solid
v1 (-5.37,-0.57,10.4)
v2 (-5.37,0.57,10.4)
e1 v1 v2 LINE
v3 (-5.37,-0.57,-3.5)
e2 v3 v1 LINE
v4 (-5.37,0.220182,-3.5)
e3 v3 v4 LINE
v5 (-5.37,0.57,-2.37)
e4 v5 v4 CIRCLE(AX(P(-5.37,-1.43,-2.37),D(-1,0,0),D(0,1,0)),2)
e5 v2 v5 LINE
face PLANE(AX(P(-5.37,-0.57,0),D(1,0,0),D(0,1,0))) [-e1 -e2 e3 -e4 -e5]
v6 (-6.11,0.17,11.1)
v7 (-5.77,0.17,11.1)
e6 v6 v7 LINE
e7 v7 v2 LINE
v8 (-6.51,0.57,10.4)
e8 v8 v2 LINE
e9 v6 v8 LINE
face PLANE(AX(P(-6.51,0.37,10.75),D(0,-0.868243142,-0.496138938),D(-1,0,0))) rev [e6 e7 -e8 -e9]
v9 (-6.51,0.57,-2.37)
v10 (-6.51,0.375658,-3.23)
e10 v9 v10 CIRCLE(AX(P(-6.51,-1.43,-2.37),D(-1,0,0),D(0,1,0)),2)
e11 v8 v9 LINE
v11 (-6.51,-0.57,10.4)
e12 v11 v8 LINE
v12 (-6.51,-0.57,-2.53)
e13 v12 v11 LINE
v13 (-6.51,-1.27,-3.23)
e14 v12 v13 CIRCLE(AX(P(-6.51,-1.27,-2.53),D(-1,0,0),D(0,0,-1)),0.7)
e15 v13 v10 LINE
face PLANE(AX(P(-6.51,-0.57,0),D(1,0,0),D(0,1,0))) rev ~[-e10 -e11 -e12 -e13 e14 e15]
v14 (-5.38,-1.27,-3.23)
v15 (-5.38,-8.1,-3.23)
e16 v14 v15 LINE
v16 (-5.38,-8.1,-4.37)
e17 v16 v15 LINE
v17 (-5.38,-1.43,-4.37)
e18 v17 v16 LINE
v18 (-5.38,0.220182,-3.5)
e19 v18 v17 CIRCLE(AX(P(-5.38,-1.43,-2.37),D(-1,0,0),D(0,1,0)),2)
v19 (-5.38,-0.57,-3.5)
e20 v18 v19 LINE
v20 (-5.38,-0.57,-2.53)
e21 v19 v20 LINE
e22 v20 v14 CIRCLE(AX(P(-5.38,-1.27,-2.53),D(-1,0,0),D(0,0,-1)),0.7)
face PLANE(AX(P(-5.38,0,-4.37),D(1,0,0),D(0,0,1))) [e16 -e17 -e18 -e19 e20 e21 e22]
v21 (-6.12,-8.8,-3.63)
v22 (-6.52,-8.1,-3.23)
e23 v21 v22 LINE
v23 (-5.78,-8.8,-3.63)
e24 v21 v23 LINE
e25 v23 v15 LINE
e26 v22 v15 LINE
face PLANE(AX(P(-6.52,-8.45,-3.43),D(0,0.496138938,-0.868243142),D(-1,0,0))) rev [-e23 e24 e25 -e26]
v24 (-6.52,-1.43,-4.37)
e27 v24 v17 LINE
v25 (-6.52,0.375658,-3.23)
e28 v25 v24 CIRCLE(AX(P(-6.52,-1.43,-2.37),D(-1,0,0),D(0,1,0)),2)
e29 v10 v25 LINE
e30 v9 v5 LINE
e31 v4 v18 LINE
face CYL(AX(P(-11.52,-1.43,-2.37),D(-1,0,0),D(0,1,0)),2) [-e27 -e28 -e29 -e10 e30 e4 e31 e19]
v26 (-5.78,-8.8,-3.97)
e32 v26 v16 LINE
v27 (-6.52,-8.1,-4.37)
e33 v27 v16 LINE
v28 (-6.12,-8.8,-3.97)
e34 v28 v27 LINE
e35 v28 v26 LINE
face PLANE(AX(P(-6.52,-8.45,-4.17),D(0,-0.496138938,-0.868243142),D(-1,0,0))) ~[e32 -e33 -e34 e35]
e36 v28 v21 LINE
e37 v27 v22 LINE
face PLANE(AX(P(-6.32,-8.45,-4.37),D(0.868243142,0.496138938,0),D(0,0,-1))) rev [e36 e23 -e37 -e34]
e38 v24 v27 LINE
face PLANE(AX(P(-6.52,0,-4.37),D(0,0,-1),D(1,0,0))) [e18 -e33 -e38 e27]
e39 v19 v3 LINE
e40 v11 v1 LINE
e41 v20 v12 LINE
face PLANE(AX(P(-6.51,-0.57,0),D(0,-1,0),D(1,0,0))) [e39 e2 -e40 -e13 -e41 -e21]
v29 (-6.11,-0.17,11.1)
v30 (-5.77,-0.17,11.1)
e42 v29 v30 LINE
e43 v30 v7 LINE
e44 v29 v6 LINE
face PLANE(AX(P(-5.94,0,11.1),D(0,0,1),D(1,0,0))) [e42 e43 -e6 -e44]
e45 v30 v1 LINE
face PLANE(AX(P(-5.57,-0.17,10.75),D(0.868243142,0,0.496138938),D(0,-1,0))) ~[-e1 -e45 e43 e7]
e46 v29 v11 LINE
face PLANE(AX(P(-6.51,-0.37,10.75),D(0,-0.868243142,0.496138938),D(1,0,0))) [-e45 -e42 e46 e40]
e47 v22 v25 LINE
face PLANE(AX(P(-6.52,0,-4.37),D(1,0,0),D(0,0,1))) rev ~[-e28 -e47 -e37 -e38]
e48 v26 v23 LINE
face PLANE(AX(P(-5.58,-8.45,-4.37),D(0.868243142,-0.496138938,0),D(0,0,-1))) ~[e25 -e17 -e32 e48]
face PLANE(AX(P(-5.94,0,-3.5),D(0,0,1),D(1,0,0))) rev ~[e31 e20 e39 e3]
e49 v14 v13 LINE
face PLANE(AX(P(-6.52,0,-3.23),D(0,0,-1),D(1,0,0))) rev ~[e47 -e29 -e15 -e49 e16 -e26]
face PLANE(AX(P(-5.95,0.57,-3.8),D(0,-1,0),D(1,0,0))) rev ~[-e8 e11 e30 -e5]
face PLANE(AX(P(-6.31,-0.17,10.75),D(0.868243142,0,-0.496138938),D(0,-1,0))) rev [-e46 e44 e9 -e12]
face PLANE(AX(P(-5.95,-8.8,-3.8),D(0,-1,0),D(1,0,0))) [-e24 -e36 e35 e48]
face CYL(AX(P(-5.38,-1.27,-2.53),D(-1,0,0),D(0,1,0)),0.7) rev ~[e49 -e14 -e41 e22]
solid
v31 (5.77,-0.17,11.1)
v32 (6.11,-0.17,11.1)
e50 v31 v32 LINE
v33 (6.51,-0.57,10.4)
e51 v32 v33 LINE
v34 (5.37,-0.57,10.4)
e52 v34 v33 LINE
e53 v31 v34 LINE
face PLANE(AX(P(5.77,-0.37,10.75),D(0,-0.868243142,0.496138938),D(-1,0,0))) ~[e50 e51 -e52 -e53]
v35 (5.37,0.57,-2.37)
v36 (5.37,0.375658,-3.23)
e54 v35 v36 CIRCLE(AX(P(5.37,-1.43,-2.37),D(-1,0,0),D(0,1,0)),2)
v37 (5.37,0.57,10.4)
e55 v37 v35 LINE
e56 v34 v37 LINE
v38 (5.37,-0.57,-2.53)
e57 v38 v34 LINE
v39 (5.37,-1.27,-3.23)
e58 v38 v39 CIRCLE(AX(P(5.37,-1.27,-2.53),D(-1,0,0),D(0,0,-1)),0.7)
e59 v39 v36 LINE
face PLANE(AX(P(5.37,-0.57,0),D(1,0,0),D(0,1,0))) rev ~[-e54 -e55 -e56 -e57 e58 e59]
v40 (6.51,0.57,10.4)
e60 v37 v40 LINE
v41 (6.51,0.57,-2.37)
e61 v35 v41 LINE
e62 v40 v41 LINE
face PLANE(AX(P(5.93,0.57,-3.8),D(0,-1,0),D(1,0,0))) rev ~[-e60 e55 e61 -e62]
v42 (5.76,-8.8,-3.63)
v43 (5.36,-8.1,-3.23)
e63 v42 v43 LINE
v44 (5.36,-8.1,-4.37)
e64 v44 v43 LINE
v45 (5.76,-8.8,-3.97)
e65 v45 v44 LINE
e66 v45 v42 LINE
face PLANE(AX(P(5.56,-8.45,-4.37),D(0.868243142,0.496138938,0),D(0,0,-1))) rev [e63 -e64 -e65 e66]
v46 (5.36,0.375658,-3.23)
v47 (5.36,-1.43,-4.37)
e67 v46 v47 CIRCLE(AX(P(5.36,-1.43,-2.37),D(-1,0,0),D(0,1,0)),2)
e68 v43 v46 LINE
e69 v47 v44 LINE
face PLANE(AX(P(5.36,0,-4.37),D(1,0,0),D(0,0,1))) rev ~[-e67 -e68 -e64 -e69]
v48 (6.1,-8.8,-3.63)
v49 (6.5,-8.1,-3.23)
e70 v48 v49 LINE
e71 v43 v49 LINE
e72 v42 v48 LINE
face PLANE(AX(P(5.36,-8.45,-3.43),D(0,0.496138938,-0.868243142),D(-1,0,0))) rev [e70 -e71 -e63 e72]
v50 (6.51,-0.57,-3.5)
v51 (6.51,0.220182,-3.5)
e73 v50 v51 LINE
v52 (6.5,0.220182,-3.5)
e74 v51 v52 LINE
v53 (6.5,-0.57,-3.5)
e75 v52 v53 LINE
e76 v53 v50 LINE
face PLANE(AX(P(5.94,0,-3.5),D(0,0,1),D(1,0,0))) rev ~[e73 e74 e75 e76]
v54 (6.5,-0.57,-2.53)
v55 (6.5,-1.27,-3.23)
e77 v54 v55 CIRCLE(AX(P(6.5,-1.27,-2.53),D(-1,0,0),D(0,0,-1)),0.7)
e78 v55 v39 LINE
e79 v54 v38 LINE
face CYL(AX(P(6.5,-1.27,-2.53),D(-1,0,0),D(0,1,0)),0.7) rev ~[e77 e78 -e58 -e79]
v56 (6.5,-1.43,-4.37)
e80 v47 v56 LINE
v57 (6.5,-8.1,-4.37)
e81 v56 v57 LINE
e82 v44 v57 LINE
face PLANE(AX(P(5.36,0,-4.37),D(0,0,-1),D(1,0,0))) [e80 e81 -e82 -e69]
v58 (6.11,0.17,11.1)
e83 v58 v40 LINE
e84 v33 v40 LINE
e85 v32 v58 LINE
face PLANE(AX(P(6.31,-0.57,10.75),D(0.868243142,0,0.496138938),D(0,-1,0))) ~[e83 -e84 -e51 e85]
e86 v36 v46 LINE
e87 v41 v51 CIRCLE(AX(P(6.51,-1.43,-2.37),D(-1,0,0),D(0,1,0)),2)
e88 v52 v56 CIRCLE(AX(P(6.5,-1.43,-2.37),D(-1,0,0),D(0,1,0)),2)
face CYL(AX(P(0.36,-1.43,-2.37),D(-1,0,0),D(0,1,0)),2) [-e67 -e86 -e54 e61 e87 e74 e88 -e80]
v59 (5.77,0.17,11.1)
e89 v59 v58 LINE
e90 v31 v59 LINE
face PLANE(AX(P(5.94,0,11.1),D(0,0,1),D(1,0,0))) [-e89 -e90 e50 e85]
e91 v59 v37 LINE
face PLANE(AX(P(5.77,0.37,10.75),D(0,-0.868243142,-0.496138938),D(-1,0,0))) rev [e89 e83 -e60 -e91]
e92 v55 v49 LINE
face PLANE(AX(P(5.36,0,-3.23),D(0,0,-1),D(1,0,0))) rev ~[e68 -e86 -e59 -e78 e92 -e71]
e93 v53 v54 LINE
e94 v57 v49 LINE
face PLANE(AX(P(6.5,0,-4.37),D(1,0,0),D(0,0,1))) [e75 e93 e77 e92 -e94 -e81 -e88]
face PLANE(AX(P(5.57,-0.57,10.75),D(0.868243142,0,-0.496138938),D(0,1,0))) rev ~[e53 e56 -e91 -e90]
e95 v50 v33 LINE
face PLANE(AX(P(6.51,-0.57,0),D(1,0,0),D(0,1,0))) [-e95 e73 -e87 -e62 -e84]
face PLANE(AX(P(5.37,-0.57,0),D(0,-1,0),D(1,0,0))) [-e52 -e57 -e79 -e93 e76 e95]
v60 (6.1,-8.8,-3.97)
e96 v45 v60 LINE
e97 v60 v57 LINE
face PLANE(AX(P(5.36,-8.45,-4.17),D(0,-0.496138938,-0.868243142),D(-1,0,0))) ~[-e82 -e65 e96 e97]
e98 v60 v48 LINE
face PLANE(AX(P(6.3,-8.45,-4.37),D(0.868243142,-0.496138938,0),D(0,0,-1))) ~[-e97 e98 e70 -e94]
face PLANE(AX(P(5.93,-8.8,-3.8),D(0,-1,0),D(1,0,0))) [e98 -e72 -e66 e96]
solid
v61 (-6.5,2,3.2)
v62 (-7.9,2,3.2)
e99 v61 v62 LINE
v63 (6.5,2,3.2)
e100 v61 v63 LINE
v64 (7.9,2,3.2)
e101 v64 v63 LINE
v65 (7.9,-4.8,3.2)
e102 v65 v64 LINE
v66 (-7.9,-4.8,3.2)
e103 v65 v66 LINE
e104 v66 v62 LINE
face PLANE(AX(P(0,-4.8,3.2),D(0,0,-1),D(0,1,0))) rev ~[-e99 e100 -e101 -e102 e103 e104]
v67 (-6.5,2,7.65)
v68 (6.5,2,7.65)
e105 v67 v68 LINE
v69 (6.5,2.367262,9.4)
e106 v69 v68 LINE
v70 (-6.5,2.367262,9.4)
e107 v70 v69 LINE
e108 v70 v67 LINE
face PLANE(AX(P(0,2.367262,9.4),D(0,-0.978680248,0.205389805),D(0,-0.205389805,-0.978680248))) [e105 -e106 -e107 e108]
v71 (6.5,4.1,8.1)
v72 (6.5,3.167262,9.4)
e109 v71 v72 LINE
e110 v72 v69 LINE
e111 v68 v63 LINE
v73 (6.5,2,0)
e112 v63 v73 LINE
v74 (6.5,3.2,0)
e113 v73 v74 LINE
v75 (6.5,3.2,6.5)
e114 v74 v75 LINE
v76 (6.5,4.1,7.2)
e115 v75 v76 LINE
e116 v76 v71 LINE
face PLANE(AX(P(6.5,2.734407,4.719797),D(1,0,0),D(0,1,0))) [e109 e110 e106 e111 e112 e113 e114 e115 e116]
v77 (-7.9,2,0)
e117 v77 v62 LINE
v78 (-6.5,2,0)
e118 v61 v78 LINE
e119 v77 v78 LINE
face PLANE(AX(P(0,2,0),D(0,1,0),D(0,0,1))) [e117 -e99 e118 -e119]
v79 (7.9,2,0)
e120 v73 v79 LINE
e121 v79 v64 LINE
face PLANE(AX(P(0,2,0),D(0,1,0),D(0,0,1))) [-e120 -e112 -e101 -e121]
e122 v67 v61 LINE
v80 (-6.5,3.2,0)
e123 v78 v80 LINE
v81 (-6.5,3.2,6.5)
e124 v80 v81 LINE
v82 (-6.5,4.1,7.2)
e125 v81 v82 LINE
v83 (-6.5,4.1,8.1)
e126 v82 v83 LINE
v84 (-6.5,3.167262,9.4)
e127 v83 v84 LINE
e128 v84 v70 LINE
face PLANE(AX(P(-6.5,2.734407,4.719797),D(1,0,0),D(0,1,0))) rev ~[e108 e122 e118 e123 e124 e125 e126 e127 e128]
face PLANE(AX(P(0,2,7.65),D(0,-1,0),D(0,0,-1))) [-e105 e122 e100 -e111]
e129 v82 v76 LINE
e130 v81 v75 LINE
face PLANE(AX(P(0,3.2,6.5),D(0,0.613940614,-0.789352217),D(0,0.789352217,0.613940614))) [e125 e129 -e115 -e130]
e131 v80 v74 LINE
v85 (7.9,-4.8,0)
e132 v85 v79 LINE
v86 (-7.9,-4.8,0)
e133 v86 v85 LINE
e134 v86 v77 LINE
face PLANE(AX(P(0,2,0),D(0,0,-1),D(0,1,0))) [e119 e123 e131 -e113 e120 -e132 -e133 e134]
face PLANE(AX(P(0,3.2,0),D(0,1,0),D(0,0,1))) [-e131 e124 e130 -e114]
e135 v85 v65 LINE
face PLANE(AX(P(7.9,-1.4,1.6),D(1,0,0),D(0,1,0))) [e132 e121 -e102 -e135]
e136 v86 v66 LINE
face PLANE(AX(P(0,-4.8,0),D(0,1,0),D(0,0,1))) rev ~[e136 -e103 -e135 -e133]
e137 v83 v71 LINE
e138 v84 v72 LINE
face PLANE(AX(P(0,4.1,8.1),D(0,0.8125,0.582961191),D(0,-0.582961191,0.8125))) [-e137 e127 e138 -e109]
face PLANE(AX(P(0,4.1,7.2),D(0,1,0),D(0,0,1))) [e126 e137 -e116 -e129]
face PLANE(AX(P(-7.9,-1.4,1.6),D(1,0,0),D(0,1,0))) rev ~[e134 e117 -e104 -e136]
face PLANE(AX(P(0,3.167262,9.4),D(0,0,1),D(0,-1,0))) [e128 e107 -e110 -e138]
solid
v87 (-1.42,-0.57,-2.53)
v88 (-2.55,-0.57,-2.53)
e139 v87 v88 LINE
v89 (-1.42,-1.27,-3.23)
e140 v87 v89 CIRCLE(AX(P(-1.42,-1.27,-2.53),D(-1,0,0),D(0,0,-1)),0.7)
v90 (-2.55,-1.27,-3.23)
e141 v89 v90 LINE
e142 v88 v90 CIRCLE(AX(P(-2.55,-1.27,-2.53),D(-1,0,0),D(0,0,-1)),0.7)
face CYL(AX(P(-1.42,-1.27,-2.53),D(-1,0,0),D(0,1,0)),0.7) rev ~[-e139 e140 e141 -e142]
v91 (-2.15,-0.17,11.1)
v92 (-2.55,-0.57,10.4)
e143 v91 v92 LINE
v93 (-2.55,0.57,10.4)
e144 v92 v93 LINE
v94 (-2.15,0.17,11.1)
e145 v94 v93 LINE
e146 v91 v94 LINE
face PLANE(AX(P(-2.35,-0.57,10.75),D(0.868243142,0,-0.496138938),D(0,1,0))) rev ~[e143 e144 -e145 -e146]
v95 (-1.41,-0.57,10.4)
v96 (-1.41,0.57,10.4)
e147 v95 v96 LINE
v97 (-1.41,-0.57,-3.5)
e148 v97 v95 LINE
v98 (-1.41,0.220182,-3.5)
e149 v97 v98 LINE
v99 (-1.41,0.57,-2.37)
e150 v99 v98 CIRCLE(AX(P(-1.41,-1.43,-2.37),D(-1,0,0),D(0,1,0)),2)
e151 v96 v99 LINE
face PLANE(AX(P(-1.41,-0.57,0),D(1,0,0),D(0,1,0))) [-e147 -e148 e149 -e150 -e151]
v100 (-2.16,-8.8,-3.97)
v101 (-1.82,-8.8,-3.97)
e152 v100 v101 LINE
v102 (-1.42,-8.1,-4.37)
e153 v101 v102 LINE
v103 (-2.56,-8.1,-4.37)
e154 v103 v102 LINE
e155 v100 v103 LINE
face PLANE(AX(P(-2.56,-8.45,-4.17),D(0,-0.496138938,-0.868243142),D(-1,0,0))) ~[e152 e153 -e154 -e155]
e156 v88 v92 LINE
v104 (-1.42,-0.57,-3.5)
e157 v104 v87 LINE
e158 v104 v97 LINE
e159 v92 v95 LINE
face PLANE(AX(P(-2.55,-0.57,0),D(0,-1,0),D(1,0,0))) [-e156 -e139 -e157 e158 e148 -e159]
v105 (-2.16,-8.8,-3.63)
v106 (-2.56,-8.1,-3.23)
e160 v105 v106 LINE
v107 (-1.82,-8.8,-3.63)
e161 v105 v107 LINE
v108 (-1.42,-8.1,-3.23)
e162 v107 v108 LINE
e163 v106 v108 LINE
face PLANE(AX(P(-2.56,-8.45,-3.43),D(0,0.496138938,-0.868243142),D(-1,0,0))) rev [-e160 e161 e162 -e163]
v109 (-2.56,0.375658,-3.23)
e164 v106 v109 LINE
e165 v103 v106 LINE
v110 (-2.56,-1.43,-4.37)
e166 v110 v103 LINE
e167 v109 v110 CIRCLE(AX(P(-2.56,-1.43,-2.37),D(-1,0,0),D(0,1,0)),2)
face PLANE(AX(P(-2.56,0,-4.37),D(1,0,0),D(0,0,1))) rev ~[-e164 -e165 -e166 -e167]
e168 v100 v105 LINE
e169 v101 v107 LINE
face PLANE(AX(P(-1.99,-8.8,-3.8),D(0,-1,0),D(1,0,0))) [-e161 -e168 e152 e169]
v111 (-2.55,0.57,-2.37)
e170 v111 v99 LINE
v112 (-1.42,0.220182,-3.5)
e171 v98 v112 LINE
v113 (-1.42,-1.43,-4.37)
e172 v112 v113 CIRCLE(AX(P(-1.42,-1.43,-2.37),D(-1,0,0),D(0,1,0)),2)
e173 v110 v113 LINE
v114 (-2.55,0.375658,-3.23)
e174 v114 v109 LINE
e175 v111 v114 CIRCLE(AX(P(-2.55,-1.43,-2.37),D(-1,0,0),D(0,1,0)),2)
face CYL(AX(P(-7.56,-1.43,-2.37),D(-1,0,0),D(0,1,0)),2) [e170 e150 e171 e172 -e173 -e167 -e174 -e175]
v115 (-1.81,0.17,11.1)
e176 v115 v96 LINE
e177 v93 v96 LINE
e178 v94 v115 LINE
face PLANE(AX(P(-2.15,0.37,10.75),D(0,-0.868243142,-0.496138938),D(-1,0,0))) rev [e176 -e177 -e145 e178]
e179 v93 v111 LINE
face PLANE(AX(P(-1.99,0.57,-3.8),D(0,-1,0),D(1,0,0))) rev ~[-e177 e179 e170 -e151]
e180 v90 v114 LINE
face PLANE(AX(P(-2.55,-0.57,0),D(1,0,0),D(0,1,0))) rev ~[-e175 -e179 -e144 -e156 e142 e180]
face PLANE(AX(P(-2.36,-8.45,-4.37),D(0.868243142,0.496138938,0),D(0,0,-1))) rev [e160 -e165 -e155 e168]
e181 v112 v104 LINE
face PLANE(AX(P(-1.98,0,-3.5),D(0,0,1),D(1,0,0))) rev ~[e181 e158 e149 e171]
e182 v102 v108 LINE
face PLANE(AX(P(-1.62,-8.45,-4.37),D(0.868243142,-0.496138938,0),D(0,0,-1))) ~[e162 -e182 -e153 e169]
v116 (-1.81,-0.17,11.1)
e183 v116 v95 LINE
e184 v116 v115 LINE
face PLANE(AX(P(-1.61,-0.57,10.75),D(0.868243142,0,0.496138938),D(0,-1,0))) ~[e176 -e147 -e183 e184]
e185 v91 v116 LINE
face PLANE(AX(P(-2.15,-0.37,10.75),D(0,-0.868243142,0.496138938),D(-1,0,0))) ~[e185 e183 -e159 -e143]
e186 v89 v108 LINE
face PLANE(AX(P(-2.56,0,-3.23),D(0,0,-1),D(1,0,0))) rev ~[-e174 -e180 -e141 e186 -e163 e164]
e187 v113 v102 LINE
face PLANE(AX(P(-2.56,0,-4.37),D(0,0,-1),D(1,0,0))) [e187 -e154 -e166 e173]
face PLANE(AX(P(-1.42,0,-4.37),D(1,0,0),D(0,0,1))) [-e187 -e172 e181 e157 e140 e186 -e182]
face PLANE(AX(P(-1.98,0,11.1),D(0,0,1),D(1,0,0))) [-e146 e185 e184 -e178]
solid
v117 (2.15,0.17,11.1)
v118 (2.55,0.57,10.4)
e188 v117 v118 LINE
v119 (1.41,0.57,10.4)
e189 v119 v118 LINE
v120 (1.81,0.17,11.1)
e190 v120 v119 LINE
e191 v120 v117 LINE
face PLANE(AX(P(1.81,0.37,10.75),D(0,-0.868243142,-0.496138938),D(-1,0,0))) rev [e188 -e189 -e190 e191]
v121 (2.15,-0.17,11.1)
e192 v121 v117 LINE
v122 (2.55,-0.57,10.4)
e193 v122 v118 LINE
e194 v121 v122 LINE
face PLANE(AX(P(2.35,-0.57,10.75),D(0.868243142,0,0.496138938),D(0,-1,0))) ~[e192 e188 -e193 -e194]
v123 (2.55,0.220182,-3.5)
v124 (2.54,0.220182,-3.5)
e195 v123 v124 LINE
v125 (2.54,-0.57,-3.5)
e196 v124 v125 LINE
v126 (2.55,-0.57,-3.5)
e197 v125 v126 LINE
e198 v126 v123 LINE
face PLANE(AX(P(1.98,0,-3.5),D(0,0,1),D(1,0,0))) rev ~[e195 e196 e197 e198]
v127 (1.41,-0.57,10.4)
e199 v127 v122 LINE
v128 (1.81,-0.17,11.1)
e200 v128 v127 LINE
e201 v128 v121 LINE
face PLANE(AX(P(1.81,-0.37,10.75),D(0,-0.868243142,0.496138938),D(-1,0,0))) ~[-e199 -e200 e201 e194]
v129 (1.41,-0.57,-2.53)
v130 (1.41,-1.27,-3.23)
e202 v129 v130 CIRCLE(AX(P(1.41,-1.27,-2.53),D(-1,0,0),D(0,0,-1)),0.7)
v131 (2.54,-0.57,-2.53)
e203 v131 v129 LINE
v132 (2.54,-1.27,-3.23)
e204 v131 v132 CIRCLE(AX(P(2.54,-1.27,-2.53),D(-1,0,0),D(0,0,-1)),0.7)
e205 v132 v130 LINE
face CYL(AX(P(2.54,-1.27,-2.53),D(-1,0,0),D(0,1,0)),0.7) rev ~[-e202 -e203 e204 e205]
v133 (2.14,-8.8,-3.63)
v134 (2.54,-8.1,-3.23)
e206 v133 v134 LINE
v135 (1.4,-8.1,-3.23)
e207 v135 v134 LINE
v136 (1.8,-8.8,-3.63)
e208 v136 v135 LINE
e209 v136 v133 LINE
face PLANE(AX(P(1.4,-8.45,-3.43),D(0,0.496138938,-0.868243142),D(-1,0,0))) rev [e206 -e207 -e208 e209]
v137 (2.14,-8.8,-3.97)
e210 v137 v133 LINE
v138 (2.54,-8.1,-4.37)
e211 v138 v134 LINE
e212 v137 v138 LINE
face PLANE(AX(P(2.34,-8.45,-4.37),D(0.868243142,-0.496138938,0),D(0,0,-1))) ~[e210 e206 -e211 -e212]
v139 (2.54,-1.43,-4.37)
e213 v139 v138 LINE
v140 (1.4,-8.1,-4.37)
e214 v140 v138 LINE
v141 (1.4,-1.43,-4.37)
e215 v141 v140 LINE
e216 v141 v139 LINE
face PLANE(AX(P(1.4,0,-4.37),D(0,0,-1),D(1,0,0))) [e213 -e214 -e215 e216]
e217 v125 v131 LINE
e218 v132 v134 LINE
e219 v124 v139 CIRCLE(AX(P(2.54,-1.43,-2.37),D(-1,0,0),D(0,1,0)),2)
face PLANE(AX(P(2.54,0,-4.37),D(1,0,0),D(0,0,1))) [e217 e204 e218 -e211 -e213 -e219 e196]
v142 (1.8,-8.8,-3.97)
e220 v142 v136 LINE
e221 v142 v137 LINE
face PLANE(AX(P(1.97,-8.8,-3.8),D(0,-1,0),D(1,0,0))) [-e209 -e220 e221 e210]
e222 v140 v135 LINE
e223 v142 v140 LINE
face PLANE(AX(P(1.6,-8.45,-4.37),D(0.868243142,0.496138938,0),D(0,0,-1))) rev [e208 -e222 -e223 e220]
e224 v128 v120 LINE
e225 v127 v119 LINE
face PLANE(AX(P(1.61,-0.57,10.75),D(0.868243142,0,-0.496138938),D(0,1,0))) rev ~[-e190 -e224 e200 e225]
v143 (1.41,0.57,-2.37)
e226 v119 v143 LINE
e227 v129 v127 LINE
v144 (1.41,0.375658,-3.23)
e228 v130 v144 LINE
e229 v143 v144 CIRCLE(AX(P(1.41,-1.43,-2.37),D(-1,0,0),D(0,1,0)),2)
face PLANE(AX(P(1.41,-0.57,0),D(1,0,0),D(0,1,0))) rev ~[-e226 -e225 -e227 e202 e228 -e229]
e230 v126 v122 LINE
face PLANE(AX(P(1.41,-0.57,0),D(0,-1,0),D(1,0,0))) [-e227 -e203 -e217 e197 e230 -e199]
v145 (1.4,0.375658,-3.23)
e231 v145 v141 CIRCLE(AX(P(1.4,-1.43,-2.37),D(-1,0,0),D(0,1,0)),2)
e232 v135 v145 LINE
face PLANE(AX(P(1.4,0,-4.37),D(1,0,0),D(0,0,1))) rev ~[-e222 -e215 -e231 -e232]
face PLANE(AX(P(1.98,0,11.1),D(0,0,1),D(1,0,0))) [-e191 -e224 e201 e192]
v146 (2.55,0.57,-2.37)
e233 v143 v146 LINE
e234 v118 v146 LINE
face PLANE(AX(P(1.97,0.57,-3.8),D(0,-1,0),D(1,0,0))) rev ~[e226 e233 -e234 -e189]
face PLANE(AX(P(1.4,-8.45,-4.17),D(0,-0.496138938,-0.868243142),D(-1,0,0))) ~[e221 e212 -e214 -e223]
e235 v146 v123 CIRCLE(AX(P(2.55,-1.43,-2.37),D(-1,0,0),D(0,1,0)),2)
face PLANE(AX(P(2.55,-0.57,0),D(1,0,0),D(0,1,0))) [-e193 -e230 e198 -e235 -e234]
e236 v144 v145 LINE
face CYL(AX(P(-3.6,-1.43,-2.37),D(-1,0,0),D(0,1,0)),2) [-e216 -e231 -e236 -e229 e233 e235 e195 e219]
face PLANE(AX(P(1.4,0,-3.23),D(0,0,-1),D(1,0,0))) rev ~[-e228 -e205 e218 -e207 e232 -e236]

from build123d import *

# Parameters (mm, degrees)
F0_W          = 6.8
F0_H          = 3.2
F1_DEPTH      = 7.9
F1_DEPTH_BACK = 7.9
F2_DEPTH      = 6.5
F2_DEPTH_BACK = 6.5
F3_W          = 1.14
F3_H          = 1.14
F4_DEPTH      = 11.1
F4_DEPTH_BACK = 3.5
F5_C1_SIZE2   = 0.4
F5_C1_SIZE    = 0.7
F5_C2_SIZE2   = 0.7
F5_C2_SIZE    = 0.4
F5_C3_SIZE2   = 0.7
F5_C3_SIZE    = 0.4
F5_C4_SIZE2   = 0.7
F5_C4_SIZE    = 0.4
F5_2_C1_SIZE2 = 0.4
F5_2_C1_SIZE  = 0.7
F5_2_C2_SIZE2 = 0.7
F5_2_C2_SIZE  = 0.4
F5_2_C3_SIZE2 = 0.7
F5_2_C3_SIZE  = 0.4
F5_2_C4_SIZE2 = 0.7
F5_2_C4_SIZE  = 0.4
F5_3_C1_SIZE2 = 0.4
F5_3_C1_SIZE  = 0.7
F5_3_C2_SIZE2 = 0.7
F5_3_C2_SIZE  = 0.4
F5_3_C3_SIZE2 = 0.7
F5_3_C3_SIZE  = 0.4
F5_3_C4_SIZE2 = 0.7
F5_3_C4_SIZE  = 0.4
F5_4_C1_SIZE2 = 0.4
F5_4_C1_SIZE  = 0.7
F5_4_C2_SIZE2 = 0.7
F5_4_C2_SIZE  = 0.4
F5_4_C3_SIZE2 = 0.7
F5_4_C3_SIZE  = 0.4
F5_4_C4_SIZE2 = 0.7
F5_4_C4_SIZE  = 0.4
F6_W          = 1.14
F6_H          = 1.14
F7_DEPTH      = 8.8
F7_DEPTH_BACK = 0.57
F8_R          = 0.7
F8_2_R        = 0.7
F8_3_R        = 0.7
F8_4_R        = 0.7
F9_T1_DEPTH   = 11.14
F9_2_T1_DEPTH = 11.14
F9_3_T1_DEPTH = 11.14
F9_4_T1_DEPTH = 11.14
F10_SIZE2     = 0.7
F10_SIZE      = 0.4
F10_2_SIZE2   = 0.7
F10_2_SIZE    = 0.4
F10_3_SIZE2   = 0.7
F10_3_SIZE    = 0.4
F10_4_SIZE2   = 0.7
F10_4_SIZE    = 0.4


# Not quite as in the source:
# - a fillet or chamfer that OpenCascade refuses, or shapes differently, is made with other operations: its cross-section is extruded or revolved along the edge and cut away or added


with BuildPart() as f1:
    # F0 (on Right) → F1 (new body, two sides)
    with BuildSketch(Plane.YZ) as f1_sk:
        with Locations((-1.4, 1.6)):
            Rectangle(F0_W, F0_H)
    extrude(amount=F1_DEPTH)
    extrude(f1_sk.sketch, amount=-F1_DEPTH_BACK)

    # F0 (on Right) → F2 (join, two sides)
    with BuildSketch(Plane.YZ) as f2_sk:
        Polygon((2, 3.2), (2, 0), (3.2, 0), (3.2, 6.5), (4.1, 7.2), (4.1, 8.1), (3.1672620947, 9.4), (2.3672620947, 9.4), (2, 7.65), align=None)
    extrude(amount=F2_DEPTH)
    extrude(f2_sk.sketch, amount=-F2_DEPTH_BACK)


with BuildPart() as f4:
    # F3 (on Top) → F4 (new body, two sides)
    with BuildSketch(Plane.XY) as f4_sk:
        with Locations((-5.94, 0)):
            Rectangle(F3_W, F3_H)
    extrude(amount=F4_DEPTH)
    extrude(f4_sk.sketch, amount=-F4_DEPTH_BACK)

    # F5: chamfer of 0.7 x 0.4 on 4 edges, made by hand

    # F5_c1
    f5_c1_edges = [f4.edges().sort_by_distance(p)[0] for p in [
        (-5.94, -0.57, 11.1),
    ]]
    f5_c1_side = f4.faces().sort_by_distance((-5.94, -0.57, 11.092))[0]
    chamfer(f5_c1_edges, length=F5_C1_SIZE, length2=F5_C1_SIZE2, reference=f5_c1_side)

    # F5_c2
    f5_c2_edges = [f4.edges().sort_by_distance(p)[0] for p in [
        (-5.94, 0.57, 11.1),
    ]]
    f5_c2_side = f4.faces().sort_by_distance((-5.94, 0.562, 11.1))[0]
    chamfer(f5_c2_edges, length=F5_C2_SIZE, length2=F5_C2_SIZE2, reference=f5_c2_side)

    # F5_c3
    f5_c3_edges = [f4.edges().sort_by_distance(p)[0] for p in [
        (-5.37, 0, 11.1),
    ]]
    f5_c3_side = f4.faces().sort_by_distance((-5.378, 0, 11.1))[0]
    chamfer(f5_c3_edges, length=F5_C3_SIZE, length2=F5_C3_SIZE2, reference=f5_c3_side)

    # F5_c4
    f5_c4_edges = [f4.edges().sort_by_distance(p)[0] for p in [
        (-6.51, 0, 11.1),
    ]]
    f5_c4_side = f4.faces().sort_by_distance((-6.502, 0, 11.1))[0]
    chamfer(f5_c4_edges, length=F5_C4_SIZE, length2=F5_C4_SIZE2, reference=f5_c4_side)

    # F6 (on Front) → F7, piece 4 (join, two sides)
    with BuildSketch(Plane.XZ) as f7_4_sk:
        with Locations((-5.95, -3.8)):
            Rectangle(F6_W, F6_H)
    extrude(amount=F7_DEPTH)
    extrude(f7_4_sk.sketch, amount=-F7_DEPTH_BACK)

    # F8
    f8_edges = [f4.edges().sort_by_distance(p)[0] for p in [
        (-5.945, -0.57, -3.23),
    ]]
    fillet(f8_edges, radius=F8_R)

    # F9: fillet of radius 2 on 1 edges, made by hand

    # F9_s2 → F9_t1 (cut)
    with BuildSketch(Plane.YZ.offset(-11.52)):
        with BuildLine():
            ThreePointArc((0.57, -2.37), (-0.0157864376, -3.7842135624), (-1.43, -4.37))
            Line((-1.43, -4.37), (0.57, -4.37))
            Line((0.57, -4.37), (0.57, -2.37))
        make_face()
    extrude(amount=F9_T1_DEPTH, mode=Mode.SUBTRACT)

    # F10
    f10_edges = [f4.edges().sort_by_distance(p)[0] for p in [
        (-5.38, -8.8, -3.8),
        (-5.95, -8.8, -3.23),
        (-6.52, -8.8, -3.8),
        (-5.95, -8.8, -4.37),
    ]]
    f10_side = f4.faces().sort_by_distance((-5.95, -8.8, -3.8))[0]
    chamfer(f10_edges, length=F10_SIZE, length2=F10_SIZE2, reference=f10_side)


with BuildPart() as f4b:
    # F3 (on Top) → F4, piece 2 (new body, two sides)
    with BuildSketch(Plane.XY) as f4_2_sk:
        with Locations((-1.98, 0)):
            Rectangle(F3_W, F3_H)
    extrude(amount=F4_DEPTH)
    extrude(f4_2_sk.sketch, amount=-F4_DEPTH_BACK)

    # F5#2: chamfer of 0.7 x 0.4 on 4 edges, made by hand

    # F5_2_c1
    f5_2_c1_edges = [f4b.edges().sort_by_distance(p)[0] for p in [
        (-2.55, 0, 11.1),
    ]]
    f5_2_c1_side = f4b.faces().sort_by_distance((-2.55, 0, 11.092))[0]
    chamfer(f5_2_c1_edges, length=F5_2_C1_SIZE, length2=F5_2_C1_SIZE2, reference=f5_2_c1_side)

    # F5_2_c2
    f5_2_c2_edges = [f4b.edges().sort_by_distance(p)[0] for p in [
        (-1.41, 0, 11.1),
    ]]
    f5_2_c2_side = f4b.faces().sort_by_distance((-1.418, 0, 11.1))[0]
    chamfer(f5_2_c2_edges, length=F5_2_C2_SIZE, length2=F5_2_C2_SIZE2, reference=f5_2_c2_side)

    # F5_2_c3
    f5_2_c3_edges = [f4b.edges().sort_by_distance(p)[0] for p in [
        (-1.98, -0.57, 11.1),
    ]]
    f5_2_c3_side = f4b.faces().sort_by_distance((-1.98, -0.562, 11.1))[0]
    chamfer(f5_2_c3_edges, length=F5_2_C3_SIZE, length2=F5_2_C3_SIZE2, reference=f5_2_c3_side)

    # F5_2_c4
    f5_2_c4_edges = [f4b.edges().sort_by_distance(p)[0] for p in [
        (-1.98, 0.57, 11.1),
    ]]
    f5_2_c4_side = f4b.faces().sort_by_distance((-1.98, 0.562, 11.1))[0]
    chamfer(f5_2_c4_edges, length=F5_2_C4_SIZE, length2=F5_2_C4_SIZE2, reference=f5_2_c4_side)

    # F6 (on Front) → F7, piece 3 (join, two sides)
    with BuildSketch(Plane.XZ) as f7_3_sk:
        with Locations((-1.99, -3.8)):
            Rectangle(F6_W, F6_H)
    extrude(amount=F7_DEPTH)
    extrude(f7_3_sk.sketch, amount=-F7_DEPTH_BACK)

    # F8#2
    f8_2_edges = [f4b.edges().sort_by_distance(p)[0] for p in [
        (-1.985, -0.57, -3.23),
    ]]
    fillet(f8_2_edges, radius=F8_2_R)

    # F9#2: fillet of radius 2 on 1 edges, made by hand

    # F9_2_s2 → F9_2_t1 (cut)
    with BuildSketch(Plane.YZ.offset(-7.56)):
        with BuildLine():
            ThreePointArc((0.57, -2.37), (-0.0157864376, -3.7842135624), (-1.43, -4.37))
            Line((-1.43, -4.37), (0.57, -4.37))
            Line((0.57, -4.37), (0.57, -2.37))
        make_face()
    extrude(amount=F9_2_T1_DEPTH, mode=Mode.SUBTRACT)

    # F10#2
    f10_2_edges = [f4b.edges().sort_by_distance(p)[0] for p in [
        (-1.42, -8.8, -3.8),
        (-1.99, -8.8, -3.23),
        (-2.56, -8.8, -3.8),
        (-1.99, -8.8, -4.37),
    ]]
    f10_2_side = f4b.faces().sort_by_distance((-1.99, -8.8, -3.8))[0]
    chamfer(f10_2_edges, length=F10_2_SIZE, length2=F10_2_SIZE2, reference=f10_2_side)


with BuildPart() as f4c:
    # F3 (on Top) → F4, piece 3 (new body, two sides)
    with BuildSketch(Plane.XY) as f4_3_sk:
        with Locations((1.98, 0)):
            Rectangle(F3_W, F3_H)
    extrude(amount=F4_DEPTH)
    extrude(f4_3_sk.sketch, amount=-F4_DEPTH_BACK)

    # F5#3: chamfer of 0.7 x 0.4 on 4 edges, made by hand

    # F5_3_c1
    f5_3_c1_edges = [f4c.edges().sort_by_distance(p)[0] for p in [
        (1.41, 0, 11.1),
    ]]
    f5_3_c1_side = f4c.faces().sort_by_distance((1.41, 0, 11.092))[0]
    chamfer(f5_3_c1_edges, length=F5_3_C1_SIZE, length2=F5_3_C1_SIZE2, reference=f5_3_c1_side)

    # F5_3_c2
    f5_3_c2_edges = [f4c.edges().sort_by_distance(p)[0] for p in [
        (2.55, 0, 11.1),
    ]]
    f5_3_c2_side = f4c.faces().sort_by_distance((2.542, 0, 11.1))[0]
    chamfer(f5_3_c2_edges, length=F5_3_C2_SIZE, length2=F5_3_C2_SIZE2, reference=f5_3_c2_side)

    # F5_3_c3
    f5_3_c3_edges = [f4c.edges().sort_by_distance(p)[0] for p in [
        (1.98, -0.57, 11.1),
    ]]
    f5_3_c3_side = f4c.faces().sort_by_distance((1.98, -0.562, 11.1))[0]
    chamfer(f5_3_c3_edges, length=F5_3_C3_SIZE, length2=F5_3_C3_SIZE2, reference=f5_3_c3_side)

    # F5_3_c4
    f5_3_c4_edges = [f4c.edges().sort_by_distance(p)[0] for p in [
        (1.98, 0.57, 11.1),
    ]]
    f5_3_c4_side = f4c.faces().sort_by_distance((1.98, 0.562, 11.1))[0]
    chamfer(f5_3_c4_edges, length=F5_3_C4_SIZE, length2=F5_3_C4_SIZE2, reference=f5_3_c4_side)

    # F6 (on Front) → F7, piece 2 (join, two sides)
    with BuildSketch(Plane.XZ) as f7_2_sk:
        with Locations((1.97, -3.8)):
            Rectangle(F6_W, F6_H)
    extrude(amount=F7_DEPTH)
    extrude(f7_2_sk.sketch, amount=-F7_DEPTH_BACK)

    # F8#3
    f8_3_edges = [f4c.edges().sort_by_distance(p)[0] for p in [
        (1.975, -0.57, -3.23),
    ]]
    fillet(f8_3_edges, radius=F8_3_R)

    # F9#3: fillet of radius 2 on 1 edges, made by hand

    # F9_3_s2 → F9_3_t1 (cut)
    with BuildSketch(Plane.YZ.offset(-3.6)):
        with BuildLine():
            ThreePointArc((0.57, -2.37), (-0.0157864376, -3.7842135624), (-1.43, -4.37))
            Line((-1.43, -4.37), (0.57, -4.37))
            Line((0.57, -4.37), (0.57, -2.37))
        make_face()
    extrude(amount=F9_3_T1_DEPTH, mode=Mode.SUBTRACT)

    # F10#3
    f10_3_edges = [f4c.edges().sort_by_distance(p)[0] for p in [
        (2.54, -8.8, -3.8),
        (1.97, -8.8, -3.23),
        (1.4, -8.8, -3.8),
        (1.97, -8.8, -4.37),
    ]]
    f10_3_side = f4c.faces().sort_by_distance((1.97, -8.8, -3.8))[0]
    chamfer(f10_3_edges, length=F10_3_SIZE, length2=F10_3_SIZE2, reference=f10_3_side)


with BuildPart() as f4d:
    # F3 (on Top) → F4, piece 4 (new body, two sides)
    with BuildSketch(Plane.XY) as f4_4_sk:
        with Locations((5.94, 0)):
            Rectangle(F3_W, F3_H)
    extrude(amount=F4_DEPTH)
    extrude(f4_4_sk.sketch, amount=-F4_DEPTH_BACK)

    # F5#4: chamfer of 0.7 x 0.4 on 4 edges, made by hand

    # F5_4_c1
    f5_4_c1_edges = [f4d.edges().sort_by_distance(p)[0] for p in [
        (5.37, 0, 11.1),
    ]]
    f5_4_c1_side = f4d.faces().sort_by_distance((5.37, 0, 11.092))[0]
    chamfer(f5_4_c1_edges, length=F5_4_C1_SIZE, length2=F5_4_C1_SIZE2, reference=f5_4_c1_side)

    # F5_4_c2
    f5_4_c2_edges = [f4d.edges().sort_by_distance(p)[0] for p in [
        (6.51, 0, 11.1),
    ]]
    f5_4_c2_side = f4d.faces().sort_by_distance((6.502, 0, 11.1))[0]
    chamfer(f5_4_c2_edges, length=F5_4_C2_SIZE, length2=F5_4_C2_SIZE2, reference=f5_4_c2_side)

    # F5_4_c3
    f5_4_c3_edges = [f4d.edges().sort_by_distance(p)[0] for p in [
        (5.94, -0.57, 11.1),
    ]]
    f5_4_c3_side = f4d.faces().sort_by_distance((5.94, -0.562, 11.1))[0]
    chamfer(f5_4_c3_edges, length=F5_4_C3_SIZE, length2=F5_4_C3_SIZE2, reference=f5_4_c3_side)

    # F5_4_c4
    f5_4_c4_edges = [f4d.edges().sort_by_distance(p)[0] for p in [
        (5.94, 0.57, 11.1),
    ]]
    f5_4_c4_side = f4d.faces().sort_by_distance((5.94, 0.562, 11.1))[0]
    chamfer(f5_4_c4_edges, length=F5_4_C4_SIZE, length2=F5_4_C4_SIZE2, reference=f5_4_c4_side)

    # F6 (on Front) → F7 (join, two sides)
    with BuildSketch(Plane.XZ) as f7_sk:
        with Locations((5.93, -3.8)):
            Rectangle(F6_W, F6_H)
    extrude(amount=F7_DEPTH)
    extrude(f7_sk.sketch, amount=-F7_DEPTH_BACK)

    # F8#4
    f8_4_edges = [f4d.edges().sort_by_distance(p)[0] for p in [
        (5.935, -0.57, -3.23),
    ]]
    fillet(f8_4_edges, radius=F8_4_R)

    # F9#4: fillet of radius 2 on 1 edges, made by hand

    # F9_4_s2 → F9_4_t1 (cut)
    with BuildSketch(Plane.YZ.offset(0.36)):
        with BuildLine():
            ThreePointArc((0.57, -2.37), (-0.0157864376, -3.7842135624), (-1.43, -4.37))
            Line((-1.43, -4.37), (0.57, -4.37))
            Line((0.57, -4.37), (0.57, -2.37))
        make_face()
    extrude(amount=F9_4_T1_DEPTH, mode=Mode.SUBTRACT)

    # F10#4
    f10_4_edges = [f4d.edges().sort_by_distance(p)[0] for p in [
        (6.5, -8.8, -3.8),
        (5.93, -8.8, -3.23),
        (5.36, -8.8, -3.8),
        (5.93, -8.8, -4.37),
    ]]
    f10_4_side = f4d.faces().sort_by_distance((5.93, -8.8, -3.8))[0]
    chamfer(f10_4_edges, length=F10_4_SIZE, length2=F10_4_SIZE2, reference=f10_4_side)


solid = Compound([f1.part, f4.part, f4b.part, f4c.part, f4d.part])
